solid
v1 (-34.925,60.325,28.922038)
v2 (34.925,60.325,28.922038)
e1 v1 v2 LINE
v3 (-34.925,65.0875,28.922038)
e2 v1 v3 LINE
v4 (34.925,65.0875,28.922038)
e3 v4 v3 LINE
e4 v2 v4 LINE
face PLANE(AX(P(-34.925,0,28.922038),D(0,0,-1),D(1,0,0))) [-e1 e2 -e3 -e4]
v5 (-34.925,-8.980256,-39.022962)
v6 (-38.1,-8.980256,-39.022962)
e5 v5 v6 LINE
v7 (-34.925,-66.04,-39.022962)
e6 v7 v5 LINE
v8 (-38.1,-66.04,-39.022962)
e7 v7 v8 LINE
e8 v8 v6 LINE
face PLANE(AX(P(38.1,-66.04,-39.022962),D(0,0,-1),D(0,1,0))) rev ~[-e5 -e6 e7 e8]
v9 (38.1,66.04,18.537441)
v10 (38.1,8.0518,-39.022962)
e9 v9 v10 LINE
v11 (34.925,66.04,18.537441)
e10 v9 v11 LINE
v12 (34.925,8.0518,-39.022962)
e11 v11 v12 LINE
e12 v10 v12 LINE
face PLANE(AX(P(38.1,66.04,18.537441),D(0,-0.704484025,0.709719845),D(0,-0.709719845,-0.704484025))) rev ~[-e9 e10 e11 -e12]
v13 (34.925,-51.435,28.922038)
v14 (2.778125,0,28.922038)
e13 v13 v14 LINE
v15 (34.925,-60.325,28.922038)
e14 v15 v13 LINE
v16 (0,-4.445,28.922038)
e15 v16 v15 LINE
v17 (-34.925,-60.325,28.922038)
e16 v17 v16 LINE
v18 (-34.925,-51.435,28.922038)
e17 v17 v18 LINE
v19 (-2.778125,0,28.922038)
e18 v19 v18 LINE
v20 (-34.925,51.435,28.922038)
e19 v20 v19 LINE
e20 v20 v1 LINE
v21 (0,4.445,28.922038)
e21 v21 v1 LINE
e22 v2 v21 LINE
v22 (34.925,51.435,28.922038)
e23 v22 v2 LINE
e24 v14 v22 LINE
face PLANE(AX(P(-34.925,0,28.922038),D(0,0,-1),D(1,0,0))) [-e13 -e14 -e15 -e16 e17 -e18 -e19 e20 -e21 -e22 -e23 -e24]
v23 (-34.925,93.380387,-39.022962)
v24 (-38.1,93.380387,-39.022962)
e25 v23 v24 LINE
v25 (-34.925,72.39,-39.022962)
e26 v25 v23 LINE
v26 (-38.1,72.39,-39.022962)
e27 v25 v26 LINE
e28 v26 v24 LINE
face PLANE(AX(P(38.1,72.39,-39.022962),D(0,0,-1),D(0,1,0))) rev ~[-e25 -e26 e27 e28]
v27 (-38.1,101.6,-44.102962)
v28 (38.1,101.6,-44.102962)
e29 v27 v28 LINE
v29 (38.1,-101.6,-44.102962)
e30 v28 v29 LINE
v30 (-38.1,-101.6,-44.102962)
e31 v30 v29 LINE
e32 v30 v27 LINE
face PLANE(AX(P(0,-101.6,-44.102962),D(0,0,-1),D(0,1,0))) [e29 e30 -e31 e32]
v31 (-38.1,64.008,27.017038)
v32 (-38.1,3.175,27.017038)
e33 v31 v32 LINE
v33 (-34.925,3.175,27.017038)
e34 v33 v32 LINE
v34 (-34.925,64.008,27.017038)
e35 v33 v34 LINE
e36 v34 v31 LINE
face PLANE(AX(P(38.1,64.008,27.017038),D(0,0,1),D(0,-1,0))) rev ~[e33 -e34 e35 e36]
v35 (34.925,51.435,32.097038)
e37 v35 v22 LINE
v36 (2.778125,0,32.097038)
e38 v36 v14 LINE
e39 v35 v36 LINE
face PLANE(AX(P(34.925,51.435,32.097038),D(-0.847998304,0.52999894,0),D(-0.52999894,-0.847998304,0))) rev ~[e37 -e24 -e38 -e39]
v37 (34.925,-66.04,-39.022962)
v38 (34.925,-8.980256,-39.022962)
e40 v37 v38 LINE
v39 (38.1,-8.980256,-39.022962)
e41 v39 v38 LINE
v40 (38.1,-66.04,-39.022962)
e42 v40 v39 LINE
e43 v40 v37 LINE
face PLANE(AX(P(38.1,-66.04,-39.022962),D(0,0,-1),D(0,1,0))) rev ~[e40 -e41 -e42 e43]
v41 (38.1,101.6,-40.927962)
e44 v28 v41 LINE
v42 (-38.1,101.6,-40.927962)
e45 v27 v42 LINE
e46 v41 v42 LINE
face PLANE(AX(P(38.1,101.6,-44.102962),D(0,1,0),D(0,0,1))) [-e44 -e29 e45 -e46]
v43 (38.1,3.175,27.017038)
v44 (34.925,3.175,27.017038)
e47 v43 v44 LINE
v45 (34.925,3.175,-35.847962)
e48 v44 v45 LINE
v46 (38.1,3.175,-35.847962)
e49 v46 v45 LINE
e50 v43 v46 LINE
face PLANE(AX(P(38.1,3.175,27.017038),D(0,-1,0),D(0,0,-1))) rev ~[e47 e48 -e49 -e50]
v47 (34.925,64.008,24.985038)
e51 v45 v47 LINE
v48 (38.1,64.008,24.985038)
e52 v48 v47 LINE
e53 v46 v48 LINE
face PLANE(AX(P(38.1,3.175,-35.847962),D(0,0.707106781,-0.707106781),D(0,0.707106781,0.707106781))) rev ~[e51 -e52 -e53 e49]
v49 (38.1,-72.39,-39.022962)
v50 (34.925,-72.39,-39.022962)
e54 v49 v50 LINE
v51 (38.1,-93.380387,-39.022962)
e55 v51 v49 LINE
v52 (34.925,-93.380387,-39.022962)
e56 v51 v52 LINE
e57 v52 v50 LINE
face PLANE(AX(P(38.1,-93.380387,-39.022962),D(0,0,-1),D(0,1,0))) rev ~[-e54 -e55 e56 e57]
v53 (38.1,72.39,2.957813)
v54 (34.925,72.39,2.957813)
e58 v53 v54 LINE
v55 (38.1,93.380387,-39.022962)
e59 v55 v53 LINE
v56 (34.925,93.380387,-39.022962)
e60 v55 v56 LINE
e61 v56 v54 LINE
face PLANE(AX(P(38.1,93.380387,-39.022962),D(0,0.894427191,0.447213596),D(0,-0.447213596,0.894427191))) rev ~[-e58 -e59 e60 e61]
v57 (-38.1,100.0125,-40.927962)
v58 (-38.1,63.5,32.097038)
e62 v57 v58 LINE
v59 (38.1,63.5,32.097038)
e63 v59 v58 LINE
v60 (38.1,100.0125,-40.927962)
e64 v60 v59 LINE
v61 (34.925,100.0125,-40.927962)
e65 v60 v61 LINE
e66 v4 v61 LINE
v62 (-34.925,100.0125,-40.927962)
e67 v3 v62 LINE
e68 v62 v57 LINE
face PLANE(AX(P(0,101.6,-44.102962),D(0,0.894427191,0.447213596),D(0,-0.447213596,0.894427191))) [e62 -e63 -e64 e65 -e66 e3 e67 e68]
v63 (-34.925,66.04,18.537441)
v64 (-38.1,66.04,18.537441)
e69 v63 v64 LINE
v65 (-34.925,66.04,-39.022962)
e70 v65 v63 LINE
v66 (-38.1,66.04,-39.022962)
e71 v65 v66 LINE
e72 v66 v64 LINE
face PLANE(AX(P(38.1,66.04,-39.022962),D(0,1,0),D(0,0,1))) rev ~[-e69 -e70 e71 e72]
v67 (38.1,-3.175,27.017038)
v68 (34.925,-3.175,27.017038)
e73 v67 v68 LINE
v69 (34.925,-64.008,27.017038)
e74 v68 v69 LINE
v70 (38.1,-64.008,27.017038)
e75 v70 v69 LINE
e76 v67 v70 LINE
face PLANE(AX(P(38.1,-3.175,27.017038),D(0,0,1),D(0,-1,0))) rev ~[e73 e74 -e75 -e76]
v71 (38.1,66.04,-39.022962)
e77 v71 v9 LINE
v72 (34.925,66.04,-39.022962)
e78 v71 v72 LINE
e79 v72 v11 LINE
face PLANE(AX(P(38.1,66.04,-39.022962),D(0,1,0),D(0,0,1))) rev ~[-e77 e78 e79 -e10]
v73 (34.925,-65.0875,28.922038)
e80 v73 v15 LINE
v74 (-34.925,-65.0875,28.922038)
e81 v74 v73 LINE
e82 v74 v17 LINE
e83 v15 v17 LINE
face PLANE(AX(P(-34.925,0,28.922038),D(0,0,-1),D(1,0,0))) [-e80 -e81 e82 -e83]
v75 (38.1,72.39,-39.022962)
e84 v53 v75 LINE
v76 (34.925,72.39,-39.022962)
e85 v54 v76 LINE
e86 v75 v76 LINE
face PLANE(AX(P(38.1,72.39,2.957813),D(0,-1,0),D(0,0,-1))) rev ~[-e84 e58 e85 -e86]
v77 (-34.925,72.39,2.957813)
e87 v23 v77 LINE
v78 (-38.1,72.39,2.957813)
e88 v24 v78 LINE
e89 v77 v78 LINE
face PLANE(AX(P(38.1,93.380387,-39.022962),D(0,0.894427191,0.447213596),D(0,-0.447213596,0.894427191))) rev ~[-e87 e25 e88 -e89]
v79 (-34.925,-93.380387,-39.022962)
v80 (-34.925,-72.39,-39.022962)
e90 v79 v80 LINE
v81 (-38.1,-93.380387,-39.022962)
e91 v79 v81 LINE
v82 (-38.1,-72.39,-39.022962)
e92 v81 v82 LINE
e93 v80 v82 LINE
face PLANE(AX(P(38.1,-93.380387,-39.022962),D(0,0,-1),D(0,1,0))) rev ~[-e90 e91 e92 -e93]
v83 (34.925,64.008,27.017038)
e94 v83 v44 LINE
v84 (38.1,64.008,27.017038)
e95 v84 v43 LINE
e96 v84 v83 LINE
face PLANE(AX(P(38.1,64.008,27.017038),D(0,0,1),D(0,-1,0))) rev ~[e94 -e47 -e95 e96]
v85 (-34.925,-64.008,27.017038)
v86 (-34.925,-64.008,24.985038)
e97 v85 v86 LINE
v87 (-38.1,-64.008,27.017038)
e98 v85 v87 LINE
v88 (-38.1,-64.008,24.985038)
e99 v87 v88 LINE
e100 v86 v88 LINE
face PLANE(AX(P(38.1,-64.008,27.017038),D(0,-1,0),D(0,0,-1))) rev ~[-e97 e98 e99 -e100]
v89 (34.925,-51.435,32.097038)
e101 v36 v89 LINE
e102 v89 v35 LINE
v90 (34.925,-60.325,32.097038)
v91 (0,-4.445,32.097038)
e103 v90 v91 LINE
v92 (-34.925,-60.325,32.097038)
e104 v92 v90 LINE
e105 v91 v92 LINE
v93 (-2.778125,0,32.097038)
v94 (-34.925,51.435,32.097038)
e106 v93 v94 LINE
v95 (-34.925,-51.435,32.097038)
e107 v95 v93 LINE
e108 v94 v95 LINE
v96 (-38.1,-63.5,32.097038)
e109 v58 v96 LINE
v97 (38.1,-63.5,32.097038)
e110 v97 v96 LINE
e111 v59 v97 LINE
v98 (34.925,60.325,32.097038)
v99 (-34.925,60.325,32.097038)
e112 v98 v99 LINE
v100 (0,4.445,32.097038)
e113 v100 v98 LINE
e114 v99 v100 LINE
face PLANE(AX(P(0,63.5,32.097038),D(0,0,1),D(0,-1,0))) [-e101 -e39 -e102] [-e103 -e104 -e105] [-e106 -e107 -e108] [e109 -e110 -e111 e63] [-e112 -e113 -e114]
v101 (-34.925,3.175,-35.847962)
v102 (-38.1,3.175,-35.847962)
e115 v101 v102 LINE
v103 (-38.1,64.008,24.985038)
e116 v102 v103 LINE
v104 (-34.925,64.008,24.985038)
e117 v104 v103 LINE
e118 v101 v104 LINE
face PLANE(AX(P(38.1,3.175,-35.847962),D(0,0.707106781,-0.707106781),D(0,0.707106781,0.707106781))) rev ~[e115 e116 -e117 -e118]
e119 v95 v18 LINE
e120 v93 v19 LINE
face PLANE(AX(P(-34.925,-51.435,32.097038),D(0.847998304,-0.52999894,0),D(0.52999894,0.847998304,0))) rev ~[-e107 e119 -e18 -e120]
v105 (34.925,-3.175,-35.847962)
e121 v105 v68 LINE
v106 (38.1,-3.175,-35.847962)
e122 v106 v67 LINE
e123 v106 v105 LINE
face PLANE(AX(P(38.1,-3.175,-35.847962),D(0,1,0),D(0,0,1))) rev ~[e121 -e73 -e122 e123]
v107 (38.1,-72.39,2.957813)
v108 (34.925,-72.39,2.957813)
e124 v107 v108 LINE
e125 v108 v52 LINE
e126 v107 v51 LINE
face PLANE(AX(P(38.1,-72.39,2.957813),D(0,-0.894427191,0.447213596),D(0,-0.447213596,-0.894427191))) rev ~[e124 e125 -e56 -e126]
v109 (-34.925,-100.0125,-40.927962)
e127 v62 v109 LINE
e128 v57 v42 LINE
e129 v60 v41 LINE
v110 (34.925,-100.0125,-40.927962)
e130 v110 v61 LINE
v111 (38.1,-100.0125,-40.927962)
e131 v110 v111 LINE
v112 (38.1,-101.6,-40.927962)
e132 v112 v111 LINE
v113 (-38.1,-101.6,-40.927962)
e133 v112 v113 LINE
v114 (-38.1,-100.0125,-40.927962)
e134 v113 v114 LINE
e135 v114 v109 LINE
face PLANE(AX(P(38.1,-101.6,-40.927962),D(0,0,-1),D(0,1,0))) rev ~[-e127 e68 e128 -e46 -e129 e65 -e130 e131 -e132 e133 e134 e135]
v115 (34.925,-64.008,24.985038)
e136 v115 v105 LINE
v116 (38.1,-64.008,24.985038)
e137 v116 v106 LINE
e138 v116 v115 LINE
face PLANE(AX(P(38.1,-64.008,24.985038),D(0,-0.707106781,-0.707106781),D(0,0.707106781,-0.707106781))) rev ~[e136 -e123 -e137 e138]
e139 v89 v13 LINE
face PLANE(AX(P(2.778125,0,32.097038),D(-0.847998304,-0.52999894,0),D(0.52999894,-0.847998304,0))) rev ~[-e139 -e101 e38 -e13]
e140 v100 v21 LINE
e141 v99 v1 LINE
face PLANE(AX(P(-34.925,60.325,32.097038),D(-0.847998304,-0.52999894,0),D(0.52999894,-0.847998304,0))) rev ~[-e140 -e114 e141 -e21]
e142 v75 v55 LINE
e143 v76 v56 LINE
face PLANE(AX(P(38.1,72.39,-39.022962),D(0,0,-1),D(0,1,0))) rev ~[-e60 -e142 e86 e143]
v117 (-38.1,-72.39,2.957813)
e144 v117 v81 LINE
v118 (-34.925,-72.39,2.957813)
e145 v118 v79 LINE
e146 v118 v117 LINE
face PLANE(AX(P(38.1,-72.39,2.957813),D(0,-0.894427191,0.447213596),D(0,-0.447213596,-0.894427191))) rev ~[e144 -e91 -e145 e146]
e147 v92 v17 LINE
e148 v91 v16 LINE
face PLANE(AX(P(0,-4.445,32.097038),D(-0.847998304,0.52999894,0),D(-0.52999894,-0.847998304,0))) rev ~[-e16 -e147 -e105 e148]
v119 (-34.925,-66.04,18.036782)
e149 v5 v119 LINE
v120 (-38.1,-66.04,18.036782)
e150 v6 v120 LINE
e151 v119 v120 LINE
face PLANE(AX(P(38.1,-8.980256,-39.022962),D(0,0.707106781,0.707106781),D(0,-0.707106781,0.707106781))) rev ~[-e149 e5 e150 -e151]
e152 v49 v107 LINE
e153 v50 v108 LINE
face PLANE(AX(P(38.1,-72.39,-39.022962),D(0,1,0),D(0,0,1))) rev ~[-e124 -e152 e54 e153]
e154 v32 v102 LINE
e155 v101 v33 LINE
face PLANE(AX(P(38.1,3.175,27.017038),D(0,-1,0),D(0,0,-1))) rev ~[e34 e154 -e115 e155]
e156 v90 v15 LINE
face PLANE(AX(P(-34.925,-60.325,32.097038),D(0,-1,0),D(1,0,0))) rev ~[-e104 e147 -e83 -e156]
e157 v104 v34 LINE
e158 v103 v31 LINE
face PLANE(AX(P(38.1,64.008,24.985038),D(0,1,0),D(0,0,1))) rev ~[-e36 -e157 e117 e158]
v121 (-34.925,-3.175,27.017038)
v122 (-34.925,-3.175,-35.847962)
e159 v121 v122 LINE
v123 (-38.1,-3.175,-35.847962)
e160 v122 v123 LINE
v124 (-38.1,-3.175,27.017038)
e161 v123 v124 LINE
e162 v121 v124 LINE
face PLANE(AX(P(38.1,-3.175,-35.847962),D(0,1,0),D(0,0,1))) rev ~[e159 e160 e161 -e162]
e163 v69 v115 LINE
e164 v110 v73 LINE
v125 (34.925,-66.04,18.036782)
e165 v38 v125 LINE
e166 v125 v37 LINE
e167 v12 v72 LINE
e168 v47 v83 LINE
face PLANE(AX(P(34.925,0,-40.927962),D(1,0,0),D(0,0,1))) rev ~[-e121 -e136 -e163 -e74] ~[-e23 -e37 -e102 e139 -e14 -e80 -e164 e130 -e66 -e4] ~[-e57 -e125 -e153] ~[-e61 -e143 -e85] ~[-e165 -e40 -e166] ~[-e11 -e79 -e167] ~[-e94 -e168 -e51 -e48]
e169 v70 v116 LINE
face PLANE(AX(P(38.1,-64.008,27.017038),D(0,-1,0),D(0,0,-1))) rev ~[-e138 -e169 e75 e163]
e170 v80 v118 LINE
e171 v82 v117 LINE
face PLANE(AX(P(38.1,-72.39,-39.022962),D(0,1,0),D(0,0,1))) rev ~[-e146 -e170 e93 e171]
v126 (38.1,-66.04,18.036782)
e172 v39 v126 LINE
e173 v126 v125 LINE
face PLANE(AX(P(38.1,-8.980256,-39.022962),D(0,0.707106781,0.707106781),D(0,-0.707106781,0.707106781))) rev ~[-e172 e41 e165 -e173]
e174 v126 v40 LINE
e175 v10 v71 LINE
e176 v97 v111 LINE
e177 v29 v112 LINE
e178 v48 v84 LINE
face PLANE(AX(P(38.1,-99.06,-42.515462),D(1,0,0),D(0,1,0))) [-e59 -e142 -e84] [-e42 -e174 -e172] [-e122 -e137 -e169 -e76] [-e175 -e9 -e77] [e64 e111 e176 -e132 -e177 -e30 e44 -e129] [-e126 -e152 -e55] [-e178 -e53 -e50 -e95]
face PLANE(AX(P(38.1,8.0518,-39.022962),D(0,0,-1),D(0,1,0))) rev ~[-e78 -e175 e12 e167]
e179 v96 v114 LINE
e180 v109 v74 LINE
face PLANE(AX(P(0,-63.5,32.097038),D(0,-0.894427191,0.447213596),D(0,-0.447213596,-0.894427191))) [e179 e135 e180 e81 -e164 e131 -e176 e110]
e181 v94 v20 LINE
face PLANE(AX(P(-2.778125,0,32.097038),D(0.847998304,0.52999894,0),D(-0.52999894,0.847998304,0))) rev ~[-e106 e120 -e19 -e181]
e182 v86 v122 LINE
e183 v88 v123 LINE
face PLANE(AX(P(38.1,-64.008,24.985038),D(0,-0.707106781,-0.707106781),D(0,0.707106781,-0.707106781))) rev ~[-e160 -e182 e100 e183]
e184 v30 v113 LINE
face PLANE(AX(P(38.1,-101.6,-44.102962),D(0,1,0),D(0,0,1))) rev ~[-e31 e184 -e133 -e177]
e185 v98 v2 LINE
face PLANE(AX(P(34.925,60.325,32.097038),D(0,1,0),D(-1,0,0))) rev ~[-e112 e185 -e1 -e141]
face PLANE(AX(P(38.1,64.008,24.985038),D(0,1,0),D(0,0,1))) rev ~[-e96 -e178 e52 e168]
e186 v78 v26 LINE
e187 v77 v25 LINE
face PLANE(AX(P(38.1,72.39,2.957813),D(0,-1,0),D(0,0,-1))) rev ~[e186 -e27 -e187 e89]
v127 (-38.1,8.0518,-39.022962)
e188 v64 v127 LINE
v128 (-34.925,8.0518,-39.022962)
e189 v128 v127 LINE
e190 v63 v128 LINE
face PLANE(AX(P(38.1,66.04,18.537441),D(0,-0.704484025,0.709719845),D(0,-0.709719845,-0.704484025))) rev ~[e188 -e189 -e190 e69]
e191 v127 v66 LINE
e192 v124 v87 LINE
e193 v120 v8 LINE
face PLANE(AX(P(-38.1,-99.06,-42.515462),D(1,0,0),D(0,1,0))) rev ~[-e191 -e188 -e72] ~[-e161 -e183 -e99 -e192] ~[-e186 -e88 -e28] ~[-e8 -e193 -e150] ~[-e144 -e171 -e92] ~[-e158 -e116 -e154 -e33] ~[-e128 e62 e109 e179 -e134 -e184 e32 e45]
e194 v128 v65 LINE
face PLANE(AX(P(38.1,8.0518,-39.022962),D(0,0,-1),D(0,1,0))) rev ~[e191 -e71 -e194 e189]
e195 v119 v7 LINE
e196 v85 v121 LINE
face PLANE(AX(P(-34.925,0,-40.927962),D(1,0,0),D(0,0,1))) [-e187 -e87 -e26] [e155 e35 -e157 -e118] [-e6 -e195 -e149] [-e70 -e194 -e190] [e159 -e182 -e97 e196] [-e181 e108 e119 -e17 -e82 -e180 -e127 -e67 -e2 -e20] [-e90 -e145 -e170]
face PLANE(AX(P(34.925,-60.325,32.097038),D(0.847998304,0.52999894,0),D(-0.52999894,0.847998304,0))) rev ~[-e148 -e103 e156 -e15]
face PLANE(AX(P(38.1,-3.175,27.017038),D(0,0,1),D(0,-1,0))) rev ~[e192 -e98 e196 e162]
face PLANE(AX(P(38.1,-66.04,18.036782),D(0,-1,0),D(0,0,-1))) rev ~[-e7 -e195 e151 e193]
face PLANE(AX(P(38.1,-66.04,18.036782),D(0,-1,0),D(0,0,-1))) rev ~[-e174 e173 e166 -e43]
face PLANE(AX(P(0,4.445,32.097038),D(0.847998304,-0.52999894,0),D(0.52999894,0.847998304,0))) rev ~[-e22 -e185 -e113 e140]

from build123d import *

# Parameters (mm, degrees)
F1_DEPTH = 38.1
F2_W     = 69.85
F2_H     = 69.85
F3_DEPTH = 127
F5_DEPTH = 76.2
F7_DEPTH = 5.588
F8_W     = 5.08
F8_H     = 3.175
F9_DEPTH = 76.2


with BuildPart() as f1:
    # F0 (on Right) → F1 (new body, symmetric)
    with BuildSketch(Plane.YZ):
        Polygon((-63.5, 32.0970378816), (-101.6, -44.1029621184), (101.6, -44.1029621184), (63.5, 32.0970378816), align=None)
    extrude(amount=F1_DEPTH, both=True)

    # F2 (on Front) → F3 (cut, symmetric)
    with BuildSketch(Plane.XZ):
        with Locations((0, -6.0029621184)):
            Rectangle(F2_W, F2_H)
    extrude(amount=F3_DEPTH, both=True, mode=Mode.SUBTRACT)

    # F4 (on face) → F5 (cut)
    with BuildSketch(Plane.YZ.offset(38.1)):
        Polygon((-72.39, 2.9578125559), (-93.3803873372, -39.0229621184), (-72.39, -39.0229621184), align=None)
        Polygon((-66.04, 18.0367817605), (-66.04, -39.0229621184), (-8.9802561211, -39.0229621184), align=None)
        Polygon((-3.175, 27.0170378816), (-64.008, 27.0170378816), (-64.008, 24.9850378816), (-3.175, -35.8479621184), align=None)
        Polygon((64.008, 27.0170378816), (3.175, 27.0170378816), (3.175, -35.8479621184), (64.008, 24.9850378816), align=None)
        Polygon((66.04, 18.5374412686), (8.0518, -39.0229621184), (66.04, -39.0229621184), align=None)
        Polygon((72.39, -39.0229621184), (93.3803873372, -39.0229621184), (72.39, 2.9578125559), align=None)
    extrude(amount=-F5_DEPTH, mode=Mode.SUBTRACT)

    # F6 (on face) → F7 (cut)
    with BuildSketch(Plane.XY.offset(32.0970378816)):
        Polygon((-34.925, 51.435), (-34.925, -51.435), (-2.778125, 0), align=None)
        Polygon((0, 4.445), (34.925, 60.325), (-34.925, 60.325), align=None)
        Polygon((2.778125, 0), (34.925, -51.435), (34.925, 51.435), align=None)
        Polygon((-34.925, -60.325), (34.925, -60.325), (0, -4.445), align=None)
    extrude(amount=-F7_DEPTH, mode=Mode.SUBTRACT)

    # F8 (on face) → F9 (join)
    with BuildSketch(Plane.YZ.offset(38.1)):
        with Locations((-99.06, -42.5154621184)):
            Rectangle(F8_W, F8_H)
        with Locations((99.06, -42.5154621184)):
            Rectangle(F8_W, F8_H)
    extrude(amount=-F9_DEPTH)


solid = f1.part
